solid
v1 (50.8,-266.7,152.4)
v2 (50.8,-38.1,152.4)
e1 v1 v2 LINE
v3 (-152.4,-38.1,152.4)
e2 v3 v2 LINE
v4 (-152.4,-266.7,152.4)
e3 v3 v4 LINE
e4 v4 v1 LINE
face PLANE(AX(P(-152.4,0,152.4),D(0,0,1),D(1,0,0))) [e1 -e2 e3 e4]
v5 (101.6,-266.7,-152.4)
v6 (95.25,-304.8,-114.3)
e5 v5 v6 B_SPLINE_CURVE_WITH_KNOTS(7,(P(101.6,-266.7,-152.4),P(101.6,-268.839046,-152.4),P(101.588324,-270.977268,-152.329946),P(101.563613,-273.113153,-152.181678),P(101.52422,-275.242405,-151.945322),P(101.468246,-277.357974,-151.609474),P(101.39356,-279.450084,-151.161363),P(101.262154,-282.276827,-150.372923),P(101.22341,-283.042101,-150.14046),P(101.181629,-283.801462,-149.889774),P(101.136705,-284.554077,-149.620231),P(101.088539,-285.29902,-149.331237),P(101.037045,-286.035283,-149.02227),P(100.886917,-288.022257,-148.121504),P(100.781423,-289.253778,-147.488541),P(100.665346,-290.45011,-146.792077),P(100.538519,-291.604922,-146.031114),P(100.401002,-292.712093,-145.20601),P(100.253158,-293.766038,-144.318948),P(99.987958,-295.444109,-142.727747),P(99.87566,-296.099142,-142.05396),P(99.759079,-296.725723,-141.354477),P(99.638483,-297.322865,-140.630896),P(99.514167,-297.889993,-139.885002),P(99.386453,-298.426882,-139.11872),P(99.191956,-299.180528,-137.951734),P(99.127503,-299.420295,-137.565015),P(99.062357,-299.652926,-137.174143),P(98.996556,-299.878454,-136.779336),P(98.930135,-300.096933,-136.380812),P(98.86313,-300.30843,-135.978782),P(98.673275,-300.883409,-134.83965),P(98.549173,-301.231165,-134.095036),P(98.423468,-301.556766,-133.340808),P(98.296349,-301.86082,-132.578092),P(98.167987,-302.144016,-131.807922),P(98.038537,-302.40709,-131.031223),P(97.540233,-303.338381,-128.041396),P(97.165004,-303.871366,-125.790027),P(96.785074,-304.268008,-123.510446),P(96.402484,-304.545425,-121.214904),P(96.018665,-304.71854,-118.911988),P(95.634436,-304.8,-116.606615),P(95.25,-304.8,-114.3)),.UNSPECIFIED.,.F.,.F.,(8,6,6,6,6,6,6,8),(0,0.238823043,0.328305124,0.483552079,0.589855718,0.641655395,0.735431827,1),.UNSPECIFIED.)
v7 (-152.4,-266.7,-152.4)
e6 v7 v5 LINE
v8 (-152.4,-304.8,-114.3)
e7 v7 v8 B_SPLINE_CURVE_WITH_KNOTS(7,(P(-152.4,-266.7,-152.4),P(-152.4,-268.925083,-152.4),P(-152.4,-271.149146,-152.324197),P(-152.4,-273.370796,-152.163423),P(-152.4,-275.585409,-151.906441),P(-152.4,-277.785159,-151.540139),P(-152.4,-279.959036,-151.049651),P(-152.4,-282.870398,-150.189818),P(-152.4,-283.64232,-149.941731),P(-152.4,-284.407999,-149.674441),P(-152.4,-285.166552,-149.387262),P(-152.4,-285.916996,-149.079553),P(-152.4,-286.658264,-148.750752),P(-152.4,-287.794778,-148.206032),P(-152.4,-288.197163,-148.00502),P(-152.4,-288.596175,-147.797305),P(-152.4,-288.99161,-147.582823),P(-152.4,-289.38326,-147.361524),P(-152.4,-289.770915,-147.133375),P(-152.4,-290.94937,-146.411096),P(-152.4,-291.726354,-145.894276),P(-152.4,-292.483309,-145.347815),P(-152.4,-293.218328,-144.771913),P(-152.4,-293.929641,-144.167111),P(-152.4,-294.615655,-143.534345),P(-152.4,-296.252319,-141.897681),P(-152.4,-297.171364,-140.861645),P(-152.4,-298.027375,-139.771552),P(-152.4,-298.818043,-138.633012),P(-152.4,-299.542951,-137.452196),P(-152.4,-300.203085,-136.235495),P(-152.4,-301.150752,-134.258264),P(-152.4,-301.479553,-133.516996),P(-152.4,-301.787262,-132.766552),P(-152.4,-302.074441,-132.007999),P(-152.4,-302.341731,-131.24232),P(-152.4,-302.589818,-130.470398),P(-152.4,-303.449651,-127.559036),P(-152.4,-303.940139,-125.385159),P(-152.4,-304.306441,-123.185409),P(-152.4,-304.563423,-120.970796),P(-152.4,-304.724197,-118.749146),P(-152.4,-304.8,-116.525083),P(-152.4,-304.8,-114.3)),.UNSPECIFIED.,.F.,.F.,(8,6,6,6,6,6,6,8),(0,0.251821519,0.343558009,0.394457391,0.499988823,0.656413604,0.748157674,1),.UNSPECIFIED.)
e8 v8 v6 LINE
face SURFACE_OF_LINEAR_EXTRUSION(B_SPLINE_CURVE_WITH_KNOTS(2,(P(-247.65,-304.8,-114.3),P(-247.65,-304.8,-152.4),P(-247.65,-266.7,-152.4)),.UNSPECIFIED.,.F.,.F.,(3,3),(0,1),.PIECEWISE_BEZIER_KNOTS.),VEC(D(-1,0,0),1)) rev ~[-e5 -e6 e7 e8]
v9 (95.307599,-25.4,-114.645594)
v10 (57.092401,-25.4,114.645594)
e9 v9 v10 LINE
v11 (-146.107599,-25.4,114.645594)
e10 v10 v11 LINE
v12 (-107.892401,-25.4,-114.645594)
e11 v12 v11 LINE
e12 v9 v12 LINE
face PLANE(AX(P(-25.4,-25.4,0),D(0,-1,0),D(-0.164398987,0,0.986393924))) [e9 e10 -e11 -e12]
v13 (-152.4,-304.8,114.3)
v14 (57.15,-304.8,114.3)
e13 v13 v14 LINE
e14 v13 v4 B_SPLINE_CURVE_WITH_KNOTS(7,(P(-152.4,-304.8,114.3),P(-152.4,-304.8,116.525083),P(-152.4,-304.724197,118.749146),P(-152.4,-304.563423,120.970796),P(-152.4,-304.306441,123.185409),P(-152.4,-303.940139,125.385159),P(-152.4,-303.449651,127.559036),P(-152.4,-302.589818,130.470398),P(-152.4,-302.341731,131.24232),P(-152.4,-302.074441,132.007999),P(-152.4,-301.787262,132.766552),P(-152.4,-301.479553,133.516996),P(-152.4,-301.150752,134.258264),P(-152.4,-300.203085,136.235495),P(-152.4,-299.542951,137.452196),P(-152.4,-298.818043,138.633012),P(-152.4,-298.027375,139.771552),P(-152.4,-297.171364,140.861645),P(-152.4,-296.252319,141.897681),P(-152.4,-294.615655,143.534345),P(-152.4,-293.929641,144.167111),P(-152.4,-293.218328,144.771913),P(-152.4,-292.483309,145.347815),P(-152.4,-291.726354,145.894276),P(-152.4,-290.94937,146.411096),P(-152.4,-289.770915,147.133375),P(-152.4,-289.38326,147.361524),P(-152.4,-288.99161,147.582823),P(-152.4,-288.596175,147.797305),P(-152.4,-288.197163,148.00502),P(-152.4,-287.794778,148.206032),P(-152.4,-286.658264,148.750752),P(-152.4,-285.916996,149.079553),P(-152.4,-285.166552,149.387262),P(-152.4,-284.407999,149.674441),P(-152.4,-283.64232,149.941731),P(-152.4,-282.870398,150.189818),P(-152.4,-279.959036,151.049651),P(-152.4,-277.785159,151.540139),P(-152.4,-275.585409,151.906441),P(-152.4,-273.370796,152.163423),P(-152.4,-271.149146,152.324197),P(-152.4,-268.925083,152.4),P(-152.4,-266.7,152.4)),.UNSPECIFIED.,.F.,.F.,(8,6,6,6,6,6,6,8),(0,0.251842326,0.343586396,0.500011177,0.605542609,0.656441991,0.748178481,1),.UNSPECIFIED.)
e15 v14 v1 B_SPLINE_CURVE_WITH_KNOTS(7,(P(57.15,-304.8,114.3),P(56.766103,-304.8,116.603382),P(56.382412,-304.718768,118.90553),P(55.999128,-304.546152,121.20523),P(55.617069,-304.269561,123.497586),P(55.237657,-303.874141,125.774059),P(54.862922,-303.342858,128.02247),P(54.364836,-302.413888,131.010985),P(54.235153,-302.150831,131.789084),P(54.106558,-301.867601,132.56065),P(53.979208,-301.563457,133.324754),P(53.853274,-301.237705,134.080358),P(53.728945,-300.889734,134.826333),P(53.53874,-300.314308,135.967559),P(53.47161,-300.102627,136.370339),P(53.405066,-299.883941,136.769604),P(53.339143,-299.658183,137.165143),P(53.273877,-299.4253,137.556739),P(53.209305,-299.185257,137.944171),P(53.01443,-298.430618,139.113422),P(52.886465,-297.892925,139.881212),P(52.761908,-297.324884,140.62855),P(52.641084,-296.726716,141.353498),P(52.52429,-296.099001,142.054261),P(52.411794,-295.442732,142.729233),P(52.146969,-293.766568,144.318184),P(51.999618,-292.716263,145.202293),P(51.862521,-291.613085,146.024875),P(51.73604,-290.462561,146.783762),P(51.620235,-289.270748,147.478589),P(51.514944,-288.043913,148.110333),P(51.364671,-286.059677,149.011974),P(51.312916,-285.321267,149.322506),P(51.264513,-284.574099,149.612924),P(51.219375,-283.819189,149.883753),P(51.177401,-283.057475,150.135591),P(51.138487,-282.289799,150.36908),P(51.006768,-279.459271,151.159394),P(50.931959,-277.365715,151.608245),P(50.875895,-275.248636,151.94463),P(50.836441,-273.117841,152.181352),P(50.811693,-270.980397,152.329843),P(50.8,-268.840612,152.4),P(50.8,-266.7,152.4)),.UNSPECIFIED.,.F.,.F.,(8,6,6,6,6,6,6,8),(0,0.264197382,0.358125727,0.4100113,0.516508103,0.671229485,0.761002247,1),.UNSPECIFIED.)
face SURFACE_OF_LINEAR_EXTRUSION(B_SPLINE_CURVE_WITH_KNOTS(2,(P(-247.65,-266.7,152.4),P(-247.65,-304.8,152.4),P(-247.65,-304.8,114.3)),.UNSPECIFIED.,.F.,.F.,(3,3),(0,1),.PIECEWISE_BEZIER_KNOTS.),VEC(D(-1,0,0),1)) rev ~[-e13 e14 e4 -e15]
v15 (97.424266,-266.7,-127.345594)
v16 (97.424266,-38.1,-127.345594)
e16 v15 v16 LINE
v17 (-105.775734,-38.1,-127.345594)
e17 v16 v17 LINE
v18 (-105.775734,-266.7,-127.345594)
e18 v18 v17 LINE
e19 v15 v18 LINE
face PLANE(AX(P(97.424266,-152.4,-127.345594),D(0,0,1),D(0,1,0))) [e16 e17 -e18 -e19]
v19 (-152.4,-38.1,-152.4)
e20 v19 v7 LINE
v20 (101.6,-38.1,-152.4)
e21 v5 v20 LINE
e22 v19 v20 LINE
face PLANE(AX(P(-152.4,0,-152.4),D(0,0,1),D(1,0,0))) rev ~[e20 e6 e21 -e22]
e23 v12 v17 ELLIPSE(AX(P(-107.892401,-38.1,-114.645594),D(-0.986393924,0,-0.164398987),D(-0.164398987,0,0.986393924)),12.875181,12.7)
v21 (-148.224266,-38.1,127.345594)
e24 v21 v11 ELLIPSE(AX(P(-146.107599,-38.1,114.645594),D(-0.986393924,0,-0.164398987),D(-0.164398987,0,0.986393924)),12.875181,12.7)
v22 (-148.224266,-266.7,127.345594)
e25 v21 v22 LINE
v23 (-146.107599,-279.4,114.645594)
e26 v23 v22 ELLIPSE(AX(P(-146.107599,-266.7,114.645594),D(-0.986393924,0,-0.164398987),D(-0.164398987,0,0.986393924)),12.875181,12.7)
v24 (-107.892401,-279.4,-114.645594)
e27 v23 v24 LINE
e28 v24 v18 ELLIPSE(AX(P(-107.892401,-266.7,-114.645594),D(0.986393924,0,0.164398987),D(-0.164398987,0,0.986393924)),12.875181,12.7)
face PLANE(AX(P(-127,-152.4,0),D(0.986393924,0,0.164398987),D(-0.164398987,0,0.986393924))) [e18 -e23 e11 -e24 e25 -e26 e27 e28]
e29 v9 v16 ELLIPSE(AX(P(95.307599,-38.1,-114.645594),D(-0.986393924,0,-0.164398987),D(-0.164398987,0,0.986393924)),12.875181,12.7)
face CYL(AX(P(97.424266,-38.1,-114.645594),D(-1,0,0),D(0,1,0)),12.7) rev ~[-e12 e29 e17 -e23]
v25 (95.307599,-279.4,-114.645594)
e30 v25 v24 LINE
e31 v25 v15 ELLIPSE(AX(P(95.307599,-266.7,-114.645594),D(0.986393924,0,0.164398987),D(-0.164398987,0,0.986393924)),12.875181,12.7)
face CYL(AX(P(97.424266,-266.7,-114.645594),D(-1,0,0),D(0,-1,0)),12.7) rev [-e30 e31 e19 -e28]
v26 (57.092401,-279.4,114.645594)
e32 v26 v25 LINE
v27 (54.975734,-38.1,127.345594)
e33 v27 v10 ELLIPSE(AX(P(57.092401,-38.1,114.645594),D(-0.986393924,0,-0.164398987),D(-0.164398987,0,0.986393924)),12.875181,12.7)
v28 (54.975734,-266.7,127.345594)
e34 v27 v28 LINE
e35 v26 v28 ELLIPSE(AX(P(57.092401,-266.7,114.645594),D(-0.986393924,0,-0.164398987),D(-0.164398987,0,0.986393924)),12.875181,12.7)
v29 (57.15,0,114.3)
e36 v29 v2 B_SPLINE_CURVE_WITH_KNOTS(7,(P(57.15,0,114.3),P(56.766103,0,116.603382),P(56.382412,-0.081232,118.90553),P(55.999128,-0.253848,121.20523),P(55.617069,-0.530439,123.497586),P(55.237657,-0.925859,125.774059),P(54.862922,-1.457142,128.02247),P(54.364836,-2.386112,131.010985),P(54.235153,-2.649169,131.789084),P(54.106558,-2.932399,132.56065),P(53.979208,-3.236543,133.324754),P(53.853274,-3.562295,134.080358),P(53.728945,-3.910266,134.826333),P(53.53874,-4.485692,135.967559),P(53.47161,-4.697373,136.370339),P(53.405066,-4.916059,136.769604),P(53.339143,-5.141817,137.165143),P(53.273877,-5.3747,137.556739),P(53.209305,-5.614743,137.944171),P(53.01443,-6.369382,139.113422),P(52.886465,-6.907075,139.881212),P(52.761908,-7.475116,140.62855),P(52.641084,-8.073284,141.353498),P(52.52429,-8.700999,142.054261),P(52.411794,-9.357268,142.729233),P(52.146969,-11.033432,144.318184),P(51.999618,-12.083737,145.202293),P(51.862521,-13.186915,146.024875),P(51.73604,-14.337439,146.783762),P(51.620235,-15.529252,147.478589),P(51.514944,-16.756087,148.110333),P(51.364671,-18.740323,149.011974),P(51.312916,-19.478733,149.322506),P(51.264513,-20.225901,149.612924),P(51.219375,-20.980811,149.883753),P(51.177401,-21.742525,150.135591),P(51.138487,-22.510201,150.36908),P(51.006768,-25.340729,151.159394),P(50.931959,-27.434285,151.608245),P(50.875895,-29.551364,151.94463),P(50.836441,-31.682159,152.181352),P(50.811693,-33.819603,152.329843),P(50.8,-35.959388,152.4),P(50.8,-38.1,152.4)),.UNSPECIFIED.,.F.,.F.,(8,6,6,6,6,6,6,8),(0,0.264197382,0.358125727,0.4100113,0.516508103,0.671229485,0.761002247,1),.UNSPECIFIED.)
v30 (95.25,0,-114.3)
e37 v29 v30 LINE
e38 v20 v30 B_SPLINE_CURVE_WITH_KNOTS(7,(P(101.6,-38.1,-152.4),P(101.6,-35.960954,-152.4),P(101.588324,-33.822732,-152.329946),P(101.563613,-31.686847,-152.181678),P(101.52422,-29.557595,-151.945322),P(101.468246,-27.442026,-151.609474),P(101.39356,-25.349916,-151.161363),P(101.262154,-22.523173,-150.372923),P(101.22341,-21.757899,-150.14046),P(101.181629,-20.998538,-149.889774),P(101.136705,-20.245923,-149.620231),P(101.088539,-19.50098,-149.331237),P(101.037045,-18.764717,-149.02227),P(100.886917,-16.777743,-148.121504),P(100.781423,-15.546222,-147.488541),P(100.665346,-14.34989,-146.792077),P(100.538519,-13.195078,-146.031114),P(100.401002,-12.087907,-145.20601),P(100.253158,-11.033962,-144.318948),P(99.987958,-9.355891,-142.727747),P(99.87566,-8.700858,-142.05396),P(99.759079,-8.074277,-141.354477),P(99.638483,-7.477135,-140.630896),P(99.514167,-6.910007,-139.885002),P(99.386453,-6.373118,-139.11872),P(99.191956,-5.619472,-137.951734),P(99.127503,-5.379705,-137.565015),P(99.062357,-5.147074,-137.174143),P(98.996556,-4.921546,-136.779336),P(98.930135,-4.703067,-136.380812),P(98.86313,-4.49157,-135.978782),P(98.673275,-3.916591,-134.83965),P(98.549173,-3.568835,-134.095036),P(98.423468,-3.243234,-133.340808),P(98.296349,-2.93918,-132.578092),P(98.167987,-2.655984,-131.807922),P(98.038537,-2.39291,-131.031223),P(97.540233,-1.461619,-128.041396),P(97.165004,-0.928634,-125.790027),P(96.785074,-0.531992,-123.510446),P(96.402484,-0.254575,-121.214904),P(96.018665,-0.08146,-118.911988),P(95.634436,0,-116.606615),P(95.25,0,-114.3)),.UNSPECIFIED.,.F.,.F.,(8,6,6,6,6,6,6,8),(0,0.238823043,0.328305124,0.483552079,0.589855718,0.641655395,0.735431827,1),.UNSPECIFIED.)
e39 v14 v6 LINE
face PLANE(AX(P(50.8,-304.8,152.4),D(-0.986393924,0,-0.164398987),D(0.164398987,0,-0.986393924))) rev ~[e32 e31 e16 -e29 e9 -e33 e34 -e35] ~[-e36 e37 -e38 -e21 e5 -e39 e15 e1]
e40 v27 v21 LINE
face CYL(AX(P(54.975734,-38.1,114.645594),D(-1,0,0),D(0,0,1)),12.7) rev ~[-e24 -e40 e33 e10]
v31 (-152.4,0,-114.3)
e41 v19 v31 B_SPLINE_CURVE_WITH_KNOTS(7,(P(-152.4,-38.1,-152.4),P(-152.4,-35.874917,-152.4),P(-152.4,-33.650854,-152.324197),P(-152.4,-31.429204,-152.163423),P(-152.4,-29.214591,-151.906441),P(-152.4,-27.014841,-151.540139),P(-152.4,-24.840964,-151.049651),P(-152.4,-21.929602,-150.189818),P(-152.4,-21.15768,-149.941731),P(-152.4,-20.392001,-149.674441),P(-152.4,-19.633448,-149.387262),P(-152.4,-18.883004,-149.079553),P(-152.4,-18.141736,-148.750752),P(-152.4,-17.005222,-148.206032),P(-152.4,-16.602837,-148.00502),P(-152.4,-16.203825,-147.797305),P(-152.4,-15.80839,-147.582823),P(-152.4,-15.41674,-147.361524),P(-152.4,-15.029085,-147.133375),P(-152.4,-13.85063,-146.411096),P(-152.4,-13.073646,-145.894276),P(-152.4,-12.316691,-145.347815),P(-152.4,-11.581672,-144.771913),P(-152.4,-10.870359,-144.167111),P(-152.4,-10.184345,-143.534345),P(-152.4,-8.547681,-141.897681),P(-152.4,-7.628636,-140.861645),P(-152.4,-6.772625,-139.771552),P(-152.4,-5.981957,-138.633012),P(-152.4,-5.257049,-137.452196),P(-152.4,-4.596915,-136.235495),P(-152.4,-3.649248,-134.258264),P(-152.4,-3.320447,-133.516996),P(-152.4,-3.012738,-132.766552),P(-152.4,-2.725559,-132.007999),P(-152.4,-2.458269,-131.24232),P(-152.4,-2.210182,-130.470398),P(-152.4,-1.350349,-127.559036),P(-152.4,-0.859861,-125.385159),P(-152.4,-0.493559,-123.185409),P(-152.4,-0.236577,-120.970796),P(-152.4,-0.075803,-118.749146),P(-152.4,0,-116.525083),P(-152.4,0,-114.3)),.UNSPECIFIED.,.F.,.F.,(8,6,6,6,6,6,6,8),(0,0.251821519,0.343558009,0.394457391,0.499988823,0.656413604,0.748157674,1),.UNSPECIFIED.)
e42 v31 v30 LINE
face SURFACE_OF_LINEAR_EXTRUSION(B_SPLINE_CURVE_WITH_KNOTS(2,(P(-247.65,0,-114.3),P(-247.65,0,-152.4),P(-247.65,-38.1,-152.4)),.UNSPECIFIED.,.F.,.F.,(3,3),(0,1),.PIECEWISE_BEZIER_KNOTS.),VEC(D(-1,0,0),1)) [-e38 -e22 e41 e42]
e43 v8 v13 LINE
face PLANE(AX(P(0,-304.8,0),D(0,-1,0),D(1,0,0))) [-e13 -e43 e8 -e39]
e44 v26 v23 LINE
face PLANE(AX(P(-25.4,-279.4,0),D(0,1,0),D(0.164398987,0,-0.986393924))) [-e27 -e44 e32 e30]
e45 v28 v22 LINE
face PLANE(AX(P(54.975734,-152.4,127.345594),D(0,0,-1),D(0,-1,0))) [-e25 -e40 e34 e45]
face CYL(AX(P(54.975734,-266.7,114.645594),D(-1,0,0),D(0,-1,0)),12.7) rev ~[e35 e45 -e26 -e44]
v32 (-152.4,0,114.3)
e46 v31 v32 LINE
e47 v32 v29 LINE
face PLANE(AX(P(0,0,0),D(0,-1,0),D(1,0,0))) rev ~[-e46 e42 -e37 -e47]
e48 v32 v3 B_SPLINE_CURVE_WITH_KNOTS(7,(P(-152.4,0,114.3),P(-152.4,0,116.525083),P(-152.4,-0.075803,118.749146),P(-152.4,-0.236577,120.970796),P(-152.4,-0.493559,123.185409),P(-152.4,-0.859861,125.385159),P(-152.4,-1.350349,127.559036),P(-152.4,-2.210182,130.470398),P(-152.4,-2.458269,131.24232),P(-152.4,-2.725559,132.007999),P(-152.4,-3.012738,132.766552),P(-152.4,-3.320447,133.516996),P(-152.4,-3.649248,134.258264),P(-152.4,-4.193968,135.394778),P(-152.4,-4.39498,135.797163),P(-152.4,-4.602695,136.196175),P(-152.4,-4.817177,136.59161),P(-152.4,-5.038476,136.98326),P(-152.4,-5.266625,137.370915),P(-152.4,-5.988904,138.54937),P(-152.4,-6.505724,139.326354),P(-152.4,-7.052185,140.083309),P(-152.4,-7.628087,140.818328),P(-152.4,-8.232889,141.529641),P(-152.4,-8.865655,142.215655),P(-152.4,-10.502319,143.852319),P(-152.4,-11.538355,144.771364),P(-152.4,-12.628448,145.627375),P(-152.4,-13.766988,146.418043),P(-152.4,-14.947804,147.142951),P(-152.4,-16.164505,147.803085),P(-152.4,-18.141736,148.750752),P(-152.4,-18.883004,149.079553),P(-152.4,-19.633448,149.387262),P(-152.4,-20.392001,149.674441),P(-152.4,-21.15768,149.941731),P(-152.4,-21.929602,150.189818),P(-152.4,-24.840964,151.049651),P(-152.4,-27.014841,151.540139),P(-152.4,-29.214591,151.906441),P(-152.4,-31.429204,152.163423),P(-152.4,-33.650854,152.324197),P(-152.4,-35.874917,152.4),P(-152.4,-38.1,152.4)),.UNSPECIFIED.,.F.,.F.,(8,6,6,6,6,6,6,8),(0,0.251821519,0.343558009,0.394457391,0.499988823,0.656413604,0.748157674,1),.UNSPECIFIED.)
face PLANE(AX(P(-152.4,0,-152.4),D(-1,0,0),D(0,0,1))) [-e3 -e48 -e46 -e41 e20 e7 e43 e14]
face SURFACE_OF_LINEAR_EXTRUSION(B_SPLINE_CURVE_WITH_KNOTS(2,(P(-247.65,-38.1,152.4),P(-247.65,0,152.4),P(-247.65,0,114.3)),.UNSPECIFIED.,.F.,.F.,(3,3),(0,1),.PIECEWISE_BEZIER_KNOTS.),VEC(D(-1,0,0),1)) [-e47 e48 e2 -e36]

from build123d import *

# Parameters (mm, degrees)
F0_W        = 304.8
F0_H        = 304.8
F1_DEPTH    = 304.8
F3_DEPTH    = 304.801
F4_T1_DEPTH = 393.7
F4_T3_DEPTH = 444.5
F5_W        = 254
F5_H        = 258.2043365391
F7_R        = 12.7


# Not quite as in the source:
# - a fillet or chamfer that OpenCascade refuses, or shapes differently, is made with other operations: its cross-section is extruded or revolved along the edge and cut away or added


with BuildPart() as f1:
    # F0 (on Front) → F1 (new body)
    with BuildSketch(Plane.XZ):
        Rectangle(F0_W, F0_H)
    extrude(amount=F1_DEPTH)

    # F2 (on face) → F3 (cut, through all)
    with BuildSketch(Plane.XZ.offset(304.8)):
        Polygon((152.4, 152.4), (50.8, 152.4), (101.6, -152.4), (152.4, -152.4), align=None)
    extrude(amount=-F3_DEPTH, mode=Mode.SUBTRACT)

    # F4: fillet of radius 38.1 on 4 edges, made by hand

    # F4_s2 → F4_t1 (cut)
    with BuildSketch(Plane.YZ.offset(-247.65)):
        with BuildLine():
            add(Edge.make_bspline(
                [(-266.7, 152.4), (-304.8, 152.4), (-304.8, 114.3)],
                knots=[0, 0, 0, 1, 1, 1], degree=2, weights=[1, 1, 1]))
            Line((-304.8, 114.3), (-304.8, 152.4))
            Line((-304.8, 152.4), (-266.7, 152.4))
        make_face()
        with BuildLine():
            add(Edge.make_bspline(
                [(-38.1, 152.4), (0, 152.4), (0, 114.3)],
                knots=[0, 0, 0, 1, 1, 1], degree=2, weights=[1, 1, 1]))
            Line((0, 114.3), (0, 152.4))
            Line((0, 152.4), (-38.1, 152.4))
        make_face()
    extrude(amount=F4_T1_DEPTH, mode=Mode.SUBTRACT)

    # F4_s4 → F4_t3 (cut)
    with BuildSketch(Plane.YZ.offset(-247.65)):
        with BuildLine():
            add(Edge.make_bspline(
                [(0, -114.3), (0, -152.4), (-38.1, -152.4)],
                knots=[0, 0, 0, 1, 1, 1], degree=2, weights=[1, 1, 1]))
            Line((-38.1, -152.4), (0, -152.4))
            Line((0, -152.4), (0, -114.3))
        make_face()
        with BuildLine():
            add(Edge.make_bspline(
                [(-304.8, -114.3), (-304.8, -152.4), (-266.7, -152.4)],
                knots=[0, 0, 0, 1, 1, 1], degree=2, weights=[1, 1, 1]))
            Line((-266.7, -152.4), (-304.8, -152.4))
            Line((-304.8, -152.4), (-304.8, -114.3))
        make_face()
    extrude(amount=F4_T3_DEPTH, mode=Mode.SUBTRACT)

    # F6: sweep along a path in F6_path
    with BuildLine(Plane(origin=(50.8, -266.7, 152.4), x_dir=(0, -1, 0), z_dir=(0, 0, -1))) as f6_path:
        Line((0, 0), (0, 203.2))
    # F5 (on face) → F6 (sweep, cut)
    with BuildSketch(Plane(origin=(74.1405405405, 0, 12.3567567568), x_dir=(0, 1, 0), z_dir=(0.9863939238, 0, 0.1643989873))):
        with Locations((-152.4, -12.5272028327)):
            Rectangle(F5_W, F5_H)
    sweep(path=f6_path.line, mode=Mode.SUBTRACT)

    # F7
    f7_edges = [f1.edges().sort_by_distance(p)[0] for p in [
        (-4.175734, -279.4, -127.345594),
        (-4.175734, -25.4, -127.345594),
        (-46.624266, -279.4, 127.345594),
        (-46.624266, -25.4, 127.345594),
    ]]
    fillet(f7_edges, radius=F7_R)


solid = f1.part
